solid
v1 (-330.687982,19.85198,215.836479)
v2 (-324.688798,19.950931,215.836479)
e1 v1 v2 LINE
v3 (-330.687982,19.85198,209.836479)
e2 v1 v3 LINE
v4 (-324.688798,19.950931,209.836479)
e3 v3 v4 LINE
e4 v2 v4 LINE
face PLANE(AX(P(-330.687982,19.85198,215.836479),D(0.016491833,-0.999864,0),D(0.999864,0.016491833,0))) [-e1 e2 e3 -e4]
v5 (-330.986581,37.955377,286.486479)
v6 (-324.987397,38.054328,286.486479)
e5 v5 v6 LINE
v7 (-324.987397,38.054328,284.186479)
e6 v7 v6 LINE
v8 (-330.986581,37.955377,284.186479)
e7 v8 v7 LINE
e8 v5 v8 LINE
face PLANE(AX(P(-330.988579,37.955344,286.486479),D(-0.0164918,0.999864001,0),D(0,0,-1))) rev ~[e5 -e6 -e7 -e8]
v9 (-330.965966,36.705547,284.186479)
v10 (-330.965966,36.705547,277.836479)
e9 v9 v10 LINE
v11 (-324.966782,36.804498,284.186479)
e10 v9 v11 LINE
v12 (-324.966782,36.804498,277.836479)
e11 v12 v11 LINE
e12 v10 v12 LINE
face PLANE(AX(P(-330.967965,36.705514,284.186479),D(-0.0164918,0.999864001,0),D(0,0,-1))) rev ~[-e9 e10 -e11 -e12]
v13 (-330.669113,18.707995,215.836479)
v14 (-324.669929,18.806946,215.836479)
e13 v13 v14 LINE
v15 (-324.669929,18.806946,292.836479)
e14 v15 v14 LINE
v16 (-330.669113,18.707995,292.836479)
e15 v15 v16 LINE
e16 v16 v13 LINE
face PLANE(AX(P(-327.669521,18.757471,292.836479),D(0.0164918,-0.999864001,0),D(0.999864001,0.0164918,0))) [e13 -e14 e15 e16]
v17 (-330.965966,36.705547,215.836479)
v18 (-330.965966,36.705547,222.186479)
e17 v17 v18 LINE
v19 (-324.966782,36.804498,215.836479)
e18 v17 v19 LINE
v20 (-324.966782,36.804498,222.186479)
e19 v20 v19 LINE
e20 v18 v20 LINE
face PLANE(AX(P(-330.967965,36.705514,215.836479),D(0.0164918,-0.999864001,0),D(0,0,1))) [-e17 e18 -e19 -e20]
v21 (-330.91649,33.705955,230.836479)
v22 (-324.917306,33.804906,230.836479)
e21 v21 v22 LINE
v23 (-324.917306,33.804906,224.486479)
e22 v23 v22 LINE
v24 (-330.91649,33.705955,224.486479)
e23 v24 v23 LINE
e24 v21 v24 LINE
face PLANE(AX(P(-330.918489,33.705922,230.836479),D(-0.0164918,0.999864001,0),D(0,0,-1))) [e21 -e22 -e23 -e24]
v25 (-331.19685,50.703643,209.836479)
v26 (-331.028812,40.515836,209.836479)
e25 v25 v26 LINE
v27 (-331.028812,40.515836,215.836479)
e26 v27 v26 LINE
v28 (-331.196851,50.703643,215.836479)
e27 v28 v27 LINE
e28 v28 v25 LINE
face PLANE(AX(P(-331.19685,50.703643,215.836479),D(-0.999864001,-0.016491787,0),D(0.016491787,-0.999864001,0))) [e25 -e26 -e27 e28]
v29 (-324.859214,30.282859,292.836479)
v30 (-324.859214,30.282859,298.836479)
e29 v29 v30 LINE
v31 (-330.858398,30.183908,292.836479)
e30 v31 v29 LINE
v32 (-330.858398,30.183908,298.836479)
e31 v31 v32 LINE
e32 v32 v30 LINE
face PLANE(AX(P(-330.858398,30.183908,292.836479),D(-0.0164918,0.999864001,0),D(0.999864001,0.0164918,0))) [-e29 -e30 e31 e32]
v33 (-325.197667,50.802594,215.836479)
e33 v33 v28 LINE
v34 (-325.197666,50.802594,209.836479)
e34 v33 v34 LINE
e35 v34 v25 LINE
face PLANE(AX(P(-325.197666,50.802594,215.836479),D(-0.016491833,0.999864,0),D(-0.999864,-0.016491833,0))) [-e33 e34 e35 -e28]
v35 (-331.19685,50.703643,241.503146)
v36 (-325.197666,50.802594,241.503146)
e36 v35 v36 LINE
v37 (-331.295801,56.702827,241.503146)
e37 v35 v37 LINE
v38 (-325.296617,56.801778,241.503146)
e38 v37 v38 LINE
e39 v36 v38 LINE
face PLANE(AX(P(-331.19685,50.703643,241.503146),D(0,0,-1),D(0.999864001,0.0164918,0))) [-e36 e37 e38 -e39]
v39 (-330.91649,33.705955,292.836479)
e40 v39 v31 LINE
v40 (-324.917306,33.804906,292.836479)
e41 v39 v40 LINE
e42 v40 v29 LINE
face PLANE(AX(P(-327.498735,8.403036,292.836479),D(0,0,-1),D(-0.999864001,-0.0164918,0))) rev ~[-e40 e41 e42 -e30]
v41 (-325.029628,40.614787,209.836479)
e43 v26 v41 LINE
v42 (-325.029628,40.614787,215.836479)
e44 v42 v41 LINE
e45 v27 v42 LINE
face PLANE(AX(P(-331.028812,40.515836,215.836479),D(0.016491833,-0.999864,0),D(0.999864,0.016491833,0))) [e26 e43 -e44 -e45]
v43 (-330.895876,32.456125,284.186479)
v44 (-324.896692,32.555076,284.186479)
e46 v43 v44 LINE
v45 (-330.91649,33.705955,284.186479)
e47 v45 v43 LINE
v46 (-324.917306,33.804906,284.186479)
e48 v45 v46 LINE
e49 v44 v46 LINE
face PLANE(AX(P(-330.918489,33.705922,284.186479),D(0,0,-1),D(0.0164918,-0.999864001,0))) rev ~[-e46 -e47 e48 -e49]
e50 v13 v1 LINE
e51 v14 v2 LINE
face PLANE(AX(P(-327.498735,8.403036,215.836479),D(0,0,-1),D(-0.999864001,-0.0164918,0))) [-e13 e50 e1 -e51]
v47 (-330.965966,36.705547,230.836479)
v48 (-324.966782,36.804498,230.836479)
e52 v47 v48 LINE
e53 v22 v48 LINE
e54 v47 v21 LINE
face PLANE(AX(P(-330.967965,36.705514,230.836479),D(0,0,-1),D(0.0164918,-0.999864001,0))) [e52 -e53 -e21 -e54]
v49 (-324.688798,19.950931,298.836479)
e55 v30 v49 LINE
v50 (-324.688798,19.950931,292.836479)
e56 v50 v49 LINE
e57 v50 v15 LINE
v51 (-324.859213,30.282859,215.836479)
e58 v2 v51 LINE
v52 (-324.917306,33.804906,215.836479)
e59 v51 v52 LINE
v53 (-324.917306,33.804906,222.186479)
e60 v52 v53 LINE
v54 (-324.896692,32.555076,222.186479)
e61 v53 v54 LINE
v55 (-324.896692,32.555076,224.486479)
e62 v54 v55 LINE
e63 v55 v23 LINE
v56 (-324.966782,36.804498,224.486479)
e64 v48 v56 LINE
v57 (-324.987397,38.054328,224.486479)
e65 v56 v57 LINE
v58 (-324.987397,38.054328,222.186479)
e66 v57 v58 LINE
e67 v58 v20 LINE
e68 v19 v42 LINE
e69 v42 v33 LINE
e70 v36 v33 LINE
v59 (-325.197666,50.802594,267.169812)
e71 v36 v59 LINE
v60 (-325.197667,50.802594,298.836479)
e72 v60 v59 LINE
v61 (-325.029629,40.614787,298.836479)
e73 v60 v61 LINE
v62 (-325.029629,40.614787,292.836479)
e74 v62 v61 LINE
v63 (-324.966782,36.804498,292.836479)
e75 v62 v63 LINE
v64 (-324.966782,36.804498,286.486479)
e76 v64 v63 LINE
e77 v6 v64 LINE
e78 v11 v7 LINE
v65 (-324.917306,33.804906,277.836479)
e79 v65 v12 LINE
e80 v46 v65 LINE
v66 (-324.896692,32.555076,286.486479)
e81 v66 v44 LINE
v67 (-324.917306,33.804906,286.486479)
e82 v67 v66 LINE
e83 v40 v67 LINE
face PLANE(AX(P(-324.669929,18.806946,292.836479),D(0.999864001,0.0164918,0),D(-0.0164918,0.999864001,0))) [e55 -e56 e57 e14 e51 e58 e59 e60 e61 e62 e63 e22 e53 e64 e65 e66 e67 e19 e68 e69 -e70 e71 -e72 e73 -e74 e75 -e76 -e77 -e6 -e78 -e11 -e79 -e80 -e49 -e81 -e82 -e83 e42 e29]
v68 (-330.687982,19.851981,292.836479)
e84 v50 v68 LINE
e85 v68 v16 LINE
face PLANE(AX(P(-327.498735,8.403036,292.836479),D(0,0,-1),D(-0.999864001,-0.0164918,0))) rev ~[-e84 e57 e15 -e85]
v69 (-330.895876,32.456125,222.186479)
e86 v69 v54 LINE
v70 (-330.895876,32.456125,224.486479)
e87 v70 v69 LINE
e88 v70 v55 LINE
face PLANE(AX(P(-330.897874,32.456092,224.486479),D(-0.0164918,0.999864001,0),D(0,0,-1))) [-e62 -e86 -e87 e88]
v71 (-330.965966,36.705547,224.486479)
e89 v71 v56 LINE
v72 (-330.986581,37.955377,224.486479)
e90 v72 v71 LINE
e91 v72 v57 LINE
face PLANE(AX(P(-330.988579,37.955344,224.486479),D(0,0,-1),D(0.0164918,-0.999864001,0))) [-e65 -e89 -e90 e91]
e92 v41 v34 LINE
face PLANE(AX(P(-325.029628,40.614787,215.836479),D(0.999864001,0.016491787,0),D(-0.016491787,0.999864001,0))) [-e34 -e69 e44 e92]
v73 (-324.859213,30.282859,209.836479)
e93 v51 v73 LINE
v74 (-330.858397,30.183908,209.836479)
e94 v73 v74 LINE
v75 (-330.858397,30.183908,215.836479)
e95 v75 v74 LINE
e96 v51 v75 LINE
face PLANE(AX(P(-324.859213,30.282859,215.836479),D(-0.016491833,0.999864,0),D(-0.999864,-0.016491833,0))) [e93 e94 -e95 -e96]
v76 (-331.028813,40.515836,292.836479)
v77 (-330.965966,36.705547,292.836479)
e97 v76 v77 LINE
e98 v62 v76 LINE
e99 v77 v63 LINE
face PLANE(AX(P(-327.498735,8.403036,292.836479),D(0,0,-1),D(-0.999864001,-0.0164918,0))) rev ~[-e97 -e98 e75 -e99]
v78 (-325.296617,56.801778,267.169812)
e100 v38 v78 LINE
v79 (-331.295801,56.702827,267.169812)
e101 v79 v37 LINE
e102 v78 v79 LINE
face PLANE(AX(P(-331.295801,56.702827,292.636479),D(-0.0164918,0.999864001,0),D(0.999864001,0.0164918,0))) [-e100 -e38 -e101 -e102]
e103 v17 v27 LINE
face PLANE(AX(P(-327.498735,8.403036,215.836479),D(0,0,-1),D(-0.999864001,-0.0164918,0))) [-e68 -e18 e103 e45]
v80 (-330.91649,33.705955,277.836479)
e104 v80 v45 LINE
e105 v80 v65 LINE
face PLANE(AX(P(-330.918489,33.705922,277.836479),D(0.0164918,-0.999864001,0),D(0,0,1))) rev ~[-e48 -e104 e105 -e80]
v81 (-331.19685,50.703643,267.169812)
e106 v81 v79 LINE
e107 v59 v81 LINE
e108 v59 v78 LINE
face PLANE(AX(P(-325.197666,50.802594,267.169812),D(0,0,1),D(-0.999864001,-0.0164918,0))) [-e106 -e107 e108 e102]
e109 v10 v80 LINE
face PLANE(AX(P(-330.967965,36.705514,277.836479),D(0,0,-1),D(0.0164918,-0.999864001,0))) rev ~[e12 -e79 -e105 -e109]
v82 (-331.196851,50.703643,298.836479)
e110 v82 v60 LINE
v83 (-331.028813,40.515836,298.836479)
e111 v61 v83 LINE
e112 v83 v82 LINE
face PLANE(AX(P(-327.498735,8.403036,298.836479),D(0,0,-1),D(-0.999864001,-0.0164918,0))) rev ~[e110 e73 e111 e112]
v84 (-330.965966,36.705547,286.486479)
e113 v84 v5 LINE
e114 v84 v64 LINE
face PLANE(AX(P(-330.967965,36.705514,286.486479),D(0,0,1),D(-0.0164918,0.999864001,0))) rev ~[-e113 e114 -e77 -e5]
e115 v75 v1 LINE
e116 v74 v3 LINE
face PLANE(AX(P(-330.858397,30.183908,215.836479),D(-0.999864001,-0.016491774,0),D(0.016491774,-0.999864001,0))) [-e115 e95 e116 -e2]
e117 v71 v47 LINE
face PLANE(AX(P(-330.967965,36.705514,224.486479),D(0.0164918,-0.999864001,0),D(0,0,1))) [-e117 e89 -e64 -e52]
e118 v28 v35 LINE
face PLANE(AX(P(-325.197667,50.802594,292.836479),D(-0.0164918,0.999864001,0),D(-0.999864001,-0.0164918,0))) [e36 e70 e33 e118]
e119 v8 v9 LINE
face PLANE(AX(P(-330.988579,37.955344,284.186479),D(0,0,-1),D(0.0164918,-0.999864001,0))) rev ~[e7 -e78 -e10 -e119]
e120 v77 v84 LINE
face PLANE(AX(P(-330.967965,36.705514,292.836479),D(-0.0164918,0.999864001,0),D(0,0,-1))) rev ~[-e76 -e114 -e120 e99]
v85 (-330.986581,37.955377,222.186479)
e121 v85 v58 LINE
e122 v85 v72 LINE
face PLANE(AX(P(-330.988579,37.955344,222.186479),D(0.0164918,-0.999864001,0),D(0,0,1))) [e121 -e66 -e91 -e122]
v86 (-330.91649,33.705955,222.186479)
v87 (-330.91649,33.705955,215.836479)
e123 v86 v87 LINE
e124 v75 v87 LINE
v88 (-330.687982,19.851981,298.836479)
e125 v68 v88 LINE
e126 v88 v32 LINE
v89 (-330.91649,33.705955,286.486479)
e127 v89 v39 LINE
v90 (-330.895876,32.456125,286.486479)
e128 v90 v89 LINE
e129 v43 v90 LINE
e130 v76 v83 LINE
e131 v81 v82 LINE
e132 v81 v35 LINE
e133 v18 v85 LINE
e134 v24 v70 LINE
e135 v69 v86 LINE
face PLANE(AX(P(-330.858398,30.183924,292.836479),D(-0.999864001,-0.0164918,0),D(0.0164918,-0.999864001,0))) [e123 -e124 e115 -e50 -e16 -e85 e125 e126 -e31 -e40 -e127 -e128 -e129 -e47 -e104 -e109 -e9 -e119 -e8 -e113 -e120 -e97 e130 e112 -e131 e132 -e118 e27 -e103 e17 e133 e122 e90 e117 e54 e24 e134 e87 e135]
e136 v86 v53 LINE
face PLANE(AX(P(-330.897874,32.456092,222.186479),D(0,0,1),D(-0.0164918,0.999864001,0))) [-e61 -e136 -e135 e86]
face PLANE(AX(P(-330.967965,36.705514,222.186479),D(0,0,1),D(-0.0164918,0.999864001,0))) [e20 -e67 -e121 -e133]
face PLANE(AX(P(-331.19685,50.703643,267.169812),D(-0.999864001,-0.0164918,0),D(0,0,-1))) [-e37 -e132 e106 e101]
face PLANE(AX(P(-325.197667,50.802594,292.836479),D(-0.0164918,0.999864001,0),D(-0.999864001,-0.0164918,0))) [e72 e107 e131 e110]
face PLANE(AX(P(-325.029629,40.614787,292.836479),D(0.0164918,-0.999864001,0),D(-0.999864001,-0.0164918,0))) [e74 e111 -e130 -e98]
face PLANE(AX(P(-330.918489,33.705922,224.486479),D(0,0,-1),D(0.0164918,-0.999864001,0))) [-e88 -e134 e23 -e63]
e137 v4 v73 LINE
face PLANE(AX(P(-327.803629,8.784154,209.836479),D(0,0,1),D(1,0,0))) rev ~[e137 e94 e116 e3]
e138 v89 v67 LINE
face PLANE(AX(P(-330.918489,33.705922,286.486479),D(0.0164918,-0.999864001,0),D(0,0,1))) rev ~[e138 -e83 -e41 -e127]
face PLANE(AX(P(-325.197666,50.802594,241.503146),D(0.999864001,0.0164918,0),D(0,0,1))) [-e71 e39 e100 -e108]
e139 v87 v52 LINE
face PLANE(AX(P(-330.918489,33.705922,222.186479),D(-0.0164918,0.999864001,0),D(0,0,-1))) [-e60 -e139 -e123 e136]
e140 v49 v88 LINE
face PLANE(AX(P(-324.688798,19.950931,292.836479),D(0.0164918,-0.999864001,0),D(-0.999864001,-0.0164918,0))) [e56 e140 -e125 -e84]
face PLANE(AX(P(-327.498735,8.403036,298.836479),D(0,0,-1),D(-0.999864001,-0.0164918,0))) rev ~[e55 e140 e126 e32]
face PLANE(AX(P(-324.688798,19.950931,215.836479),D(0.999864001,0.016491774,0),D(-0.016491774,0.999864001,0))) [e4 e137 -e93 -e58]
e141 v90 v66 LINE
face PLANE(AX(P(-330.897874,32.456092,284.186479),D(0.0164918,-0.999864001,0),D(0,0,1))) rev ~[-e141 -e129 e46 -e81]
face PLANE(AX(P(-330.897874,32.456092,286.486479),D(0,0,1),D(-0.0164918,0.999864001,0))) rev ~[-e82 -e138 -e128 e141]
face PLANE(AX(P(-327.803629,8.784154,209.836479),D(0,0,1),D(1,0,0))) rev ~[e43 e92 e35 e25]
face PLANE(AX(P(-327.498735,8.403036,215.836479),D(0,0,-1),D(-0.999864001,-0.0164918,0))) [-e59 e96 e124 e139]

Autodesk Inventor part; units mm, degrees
ref_plane "YZ Plane" through (0, 0, 0) normal (1, 0, 0) x (0, 1, 0)
ref_plane "XZ Plane" through (0, 0, 0) normal (0, 1, 0) x (-1, 0, 0)
ref_plane "XY Plane" through (0, 0, 0) normal (0, 0, 1) x (1, 0, 0)
ref_plane "РабПлоскость1" through (-327.803629, 8.784154, 215.836479) normal (0, 0, 1) x (1, 0, 0)
sketch "Эскиз1" plane through (-327.803629, 8.784154, 215.836479) normal (0, 0, 1) x (1, 0, 0)
  line L0 (3.114831, 11.166777) -> (2.944416, 21.498705)
  line L1 (2.944416, 21.498705) -> (-3.054768, 21.399754)
  line L2 (-3.054768, 21.399754) -> (-2.884353, 11.067826)
  line L3 (-2.884353, 11.067826) -> (3.114831, 11.166777)
  line L4 (-3.393221, 41.919489) -> (-3.225183, 31.731682)
  line L5 (2.774001, 31.830633) -> (2.605963, 42.01844)
  line L6 (-3.225183, 31.731682) -> (2.774001, 31.830633)
  line L7 (2.605963, 42.01844) -> (-3.393221, 41.919489)
  line L8 (2.774001, 31.830633) -> (2.605963, 42.01844) construction
  line L9 (-3.393221, 41.919489) -> (-3.225183, 31.731682) construction
  line L10 (3.114831, 11.166777) -> (2.944416, 21.498705) construction
  line L11 (-3.054768, 21.399754) -> (-2.884353, 11.067826) construction
  line L12 (6.149374, 48.077701) -> (19.433282, 48.296806) construction
  line L13 (2.605963, 42.01844) -> (6.248325, 42.078517) construction
  point P0 (327.803629, -8.784154)
  dimension "d16" = 6
extrude "Выдавливание1" add sketch "Эскиз1" against normal blind 6
ref_plane "РабПлоскость2" through (-327.498735, 8.403036, 292.836479) normal (0, 0, -1) x (-0.999864, -0.0164918, 0)
sketch "Эскиз2" plane through (-327.498735, 8.403036, 292.836479) normal (0, 0, -1) x (-0.999864, -0.0164918, 0)
  line L0 (-3, 21.833317) -> (3, 21.833317)
  line L1 (3, 21.833317) -> (3, 11.499984)
  line L2 (3, 11.5) -> (-3, 11.5)
  line L3 (-3, 11.499984) -> (-3, 21.833317)
  line L4 (3, 32.16665) -> (-3, 32.16665)
  line L5 (-3, 32.16665) -> (-3, 42.355843)
  line L6 (-3, 42.5) -> (3, 42.5)
  line L7 (3, 42.355843) -> (3, 32.16665)
  line L8 (-3, 11.499984) -> (-3, 21.833317) construction
  line L9 (3, 21.833317) -> (3, 11.499984) construction
  line L10 (-3, 32.16665) -> (-3, 42.355843) construction
  line L11 (3, 42.355843) -> (3, 32.16665) construction
  point P0 (-327.315615, -13.802923)
sketch "Эскиз2 outline for Выдавливание2" plane through (-327.498735, 8.403036, 292.836479) normal (0, 0, -1) x (-0.999864, -0.0164918, 0)
  line L0 (3, 32.16665) -> (3, 42.355843)
  line L1 (-3, 32.16665) -> (3, 32.16665)
  line L2 (-3, 42.355843) -> (-3, 32.16665)
  line L3 (3, 42.355843) -> (-3, 42.355843)
  line L4 (-3, 21.833317) -> (-3, 11.499984)
  line L5 (3, 21.833317) -> (-3, 21.833317)
  line L6 (3, 11.499984) -> (3, 21.833317)
  line L7 (-3, 11.499984) -> (3, 11.499984)
extrude "Выдавливание2" add sketch "Эскиз2 outline for Выдавливание2" against normal blind 6
sketch "Эскиз3" plane through (-327.498735, 8.403036, 292.836479) normal (0, 0, -1) x (-0.999864, -0.0164918, 0)
  circle A0 centre (0, -7.644157) radius 18
  line L0 (6.642857, 42.355843) -> (3, 42.355843)
  line L1 (-3, 32.166667) -> (-3, 21.833333)
  line L2 (-3, 21.833333) -> (3, 21.833333)
  line L3 (3, 21.833333) -> (3, 32.166667)
  line L4 (3, 32.166667) -> (-3, 32.166667)
  line L5 (-3, 42.355843) -> (3, 42.355843)
  line L6 (3, 42.355843) -> (3, 10.355843)
  line L7 (3, 10.355843) -> (-3, 10.355843)
  line L8 (-3, 10.355843) -> (-3, 42.355843)
  point P0 (-327.315615, -13.802923)
  point P1 (-3, 21.833333)
  point P2 (3, 21.833333)
  point P3 (3, 42.355843)
extrude "Выдавливание3" add sketch "Эскиз3" along normal up to surface (77 mm away) contours L7 L8 L2 L6 | L2 L1 L4 L3 | L4 L8 L5 L6
sketch "Эскиз4" plane through (-331.19685, 50.703643, 209.836479) normal (-0.999864, -0.0164918, 0) x (0, 0, 1)
  line L0 (0, -14) -> (6, -14) construction
  line L1 (0, -17) -> (6, -17) construction
  line L2 (6, -17) -> (6, -14)
  line L3 (6, -14) -> (12.35, -14)
  line L4 (12.35, -14) -> (12.35, -12.75)
  line L5 (12.35, -12.75) -> (14.65, -12.75)
  line L6 (14.65, -12.75) -> (14.65, -14)
  line L7 (14.65, -14) -> (21, -14)
  line L8 (21, -14) -> (21, -17)
  line L9 (21, -17) -> (14.65, -17)
  line L10 (14.65, -17) -> (14.65, -18.25)
  line L11 (14.65, -18.25) -> (12.35, -18.25)
  line L12 (12.35, -18.25) -> (12.35, -17)
  line L13 (12.35, -17) -> (6, -17)
  line L14 (0, -20.522506) -> (0, -30.855843) construction
  line L15 (89, -10.189193) -> (89, 0) construction
  line L16 (0, -30.855843) -> (89, 0) construction
  line L17 (44.5, 0) -> (44.5, -30.855843) construction
  line L18 (89, -14) -> (83, -14) construction
  line L19 (89, -17) -> (83, -17) construction
  line L20 (83, -17) -> (83, -14)
  line L21 (83, -14) -> (76.65, -14)
  line L22 (76.65, -14) -> (76.65, -12.75)
  line L23 (76.65, -12.75) -> (74.35, -12.75)
  line L24 (74.35, -12.75) -> (74.35, -14)
  line L25 (74.35, -14) -> (68, -14)
  line L26 (68, -14) -> (68, -17)
  line L27 (68, -17) -> (74.35, -17)
  line L28 (74.35, -17) -> (74.35, -18.25)
  line L29 (74.35, -18.25) -> (76.65, -18.25)
  line L30 (76.65, -18.25) -> (76.65, -17)
  line L31 (76.65, -17) -> (83, -17)
  point P0 (-209.836479, -56.158766)
  point P1 (44.5, -15.427922)
  dimension "d9" = 2.3
  dimension "d10" = 5.5
  dimension "d11" = 15
extrude "Выдавливание4" cut sketch "Эскиз4" against normal blind 6
sketch "Эскиз5" plane through (-331.19685, 50.703643, 292.636479) normal (-0.0164918, 0.999864, 0) x (0.999864, 0.0164918, 0)
  line L0 (6, 51.133333) -> (6, 25.466667)
  line L1 (0, 51.133333) -> (6, 51.133333)
  line L2 (0, 25.466667) -> (0, 51.133333)
  line L3 (6, 25.466667) -> (0, 25.466667)
  point P0 (330.315615, 292.636479)
extrude "Выдавливание5" add sketch "Эскиз5" along normal blind 6
equation "\"d1\" = d0"
equation "\"d3\" = d0"
equation "\"d7\" = d0"
equation "\"d12\" = d3"
equation "\"d14\" = d0"
equation "\"d0\" = d16"
properties part number "Korpus 6"
